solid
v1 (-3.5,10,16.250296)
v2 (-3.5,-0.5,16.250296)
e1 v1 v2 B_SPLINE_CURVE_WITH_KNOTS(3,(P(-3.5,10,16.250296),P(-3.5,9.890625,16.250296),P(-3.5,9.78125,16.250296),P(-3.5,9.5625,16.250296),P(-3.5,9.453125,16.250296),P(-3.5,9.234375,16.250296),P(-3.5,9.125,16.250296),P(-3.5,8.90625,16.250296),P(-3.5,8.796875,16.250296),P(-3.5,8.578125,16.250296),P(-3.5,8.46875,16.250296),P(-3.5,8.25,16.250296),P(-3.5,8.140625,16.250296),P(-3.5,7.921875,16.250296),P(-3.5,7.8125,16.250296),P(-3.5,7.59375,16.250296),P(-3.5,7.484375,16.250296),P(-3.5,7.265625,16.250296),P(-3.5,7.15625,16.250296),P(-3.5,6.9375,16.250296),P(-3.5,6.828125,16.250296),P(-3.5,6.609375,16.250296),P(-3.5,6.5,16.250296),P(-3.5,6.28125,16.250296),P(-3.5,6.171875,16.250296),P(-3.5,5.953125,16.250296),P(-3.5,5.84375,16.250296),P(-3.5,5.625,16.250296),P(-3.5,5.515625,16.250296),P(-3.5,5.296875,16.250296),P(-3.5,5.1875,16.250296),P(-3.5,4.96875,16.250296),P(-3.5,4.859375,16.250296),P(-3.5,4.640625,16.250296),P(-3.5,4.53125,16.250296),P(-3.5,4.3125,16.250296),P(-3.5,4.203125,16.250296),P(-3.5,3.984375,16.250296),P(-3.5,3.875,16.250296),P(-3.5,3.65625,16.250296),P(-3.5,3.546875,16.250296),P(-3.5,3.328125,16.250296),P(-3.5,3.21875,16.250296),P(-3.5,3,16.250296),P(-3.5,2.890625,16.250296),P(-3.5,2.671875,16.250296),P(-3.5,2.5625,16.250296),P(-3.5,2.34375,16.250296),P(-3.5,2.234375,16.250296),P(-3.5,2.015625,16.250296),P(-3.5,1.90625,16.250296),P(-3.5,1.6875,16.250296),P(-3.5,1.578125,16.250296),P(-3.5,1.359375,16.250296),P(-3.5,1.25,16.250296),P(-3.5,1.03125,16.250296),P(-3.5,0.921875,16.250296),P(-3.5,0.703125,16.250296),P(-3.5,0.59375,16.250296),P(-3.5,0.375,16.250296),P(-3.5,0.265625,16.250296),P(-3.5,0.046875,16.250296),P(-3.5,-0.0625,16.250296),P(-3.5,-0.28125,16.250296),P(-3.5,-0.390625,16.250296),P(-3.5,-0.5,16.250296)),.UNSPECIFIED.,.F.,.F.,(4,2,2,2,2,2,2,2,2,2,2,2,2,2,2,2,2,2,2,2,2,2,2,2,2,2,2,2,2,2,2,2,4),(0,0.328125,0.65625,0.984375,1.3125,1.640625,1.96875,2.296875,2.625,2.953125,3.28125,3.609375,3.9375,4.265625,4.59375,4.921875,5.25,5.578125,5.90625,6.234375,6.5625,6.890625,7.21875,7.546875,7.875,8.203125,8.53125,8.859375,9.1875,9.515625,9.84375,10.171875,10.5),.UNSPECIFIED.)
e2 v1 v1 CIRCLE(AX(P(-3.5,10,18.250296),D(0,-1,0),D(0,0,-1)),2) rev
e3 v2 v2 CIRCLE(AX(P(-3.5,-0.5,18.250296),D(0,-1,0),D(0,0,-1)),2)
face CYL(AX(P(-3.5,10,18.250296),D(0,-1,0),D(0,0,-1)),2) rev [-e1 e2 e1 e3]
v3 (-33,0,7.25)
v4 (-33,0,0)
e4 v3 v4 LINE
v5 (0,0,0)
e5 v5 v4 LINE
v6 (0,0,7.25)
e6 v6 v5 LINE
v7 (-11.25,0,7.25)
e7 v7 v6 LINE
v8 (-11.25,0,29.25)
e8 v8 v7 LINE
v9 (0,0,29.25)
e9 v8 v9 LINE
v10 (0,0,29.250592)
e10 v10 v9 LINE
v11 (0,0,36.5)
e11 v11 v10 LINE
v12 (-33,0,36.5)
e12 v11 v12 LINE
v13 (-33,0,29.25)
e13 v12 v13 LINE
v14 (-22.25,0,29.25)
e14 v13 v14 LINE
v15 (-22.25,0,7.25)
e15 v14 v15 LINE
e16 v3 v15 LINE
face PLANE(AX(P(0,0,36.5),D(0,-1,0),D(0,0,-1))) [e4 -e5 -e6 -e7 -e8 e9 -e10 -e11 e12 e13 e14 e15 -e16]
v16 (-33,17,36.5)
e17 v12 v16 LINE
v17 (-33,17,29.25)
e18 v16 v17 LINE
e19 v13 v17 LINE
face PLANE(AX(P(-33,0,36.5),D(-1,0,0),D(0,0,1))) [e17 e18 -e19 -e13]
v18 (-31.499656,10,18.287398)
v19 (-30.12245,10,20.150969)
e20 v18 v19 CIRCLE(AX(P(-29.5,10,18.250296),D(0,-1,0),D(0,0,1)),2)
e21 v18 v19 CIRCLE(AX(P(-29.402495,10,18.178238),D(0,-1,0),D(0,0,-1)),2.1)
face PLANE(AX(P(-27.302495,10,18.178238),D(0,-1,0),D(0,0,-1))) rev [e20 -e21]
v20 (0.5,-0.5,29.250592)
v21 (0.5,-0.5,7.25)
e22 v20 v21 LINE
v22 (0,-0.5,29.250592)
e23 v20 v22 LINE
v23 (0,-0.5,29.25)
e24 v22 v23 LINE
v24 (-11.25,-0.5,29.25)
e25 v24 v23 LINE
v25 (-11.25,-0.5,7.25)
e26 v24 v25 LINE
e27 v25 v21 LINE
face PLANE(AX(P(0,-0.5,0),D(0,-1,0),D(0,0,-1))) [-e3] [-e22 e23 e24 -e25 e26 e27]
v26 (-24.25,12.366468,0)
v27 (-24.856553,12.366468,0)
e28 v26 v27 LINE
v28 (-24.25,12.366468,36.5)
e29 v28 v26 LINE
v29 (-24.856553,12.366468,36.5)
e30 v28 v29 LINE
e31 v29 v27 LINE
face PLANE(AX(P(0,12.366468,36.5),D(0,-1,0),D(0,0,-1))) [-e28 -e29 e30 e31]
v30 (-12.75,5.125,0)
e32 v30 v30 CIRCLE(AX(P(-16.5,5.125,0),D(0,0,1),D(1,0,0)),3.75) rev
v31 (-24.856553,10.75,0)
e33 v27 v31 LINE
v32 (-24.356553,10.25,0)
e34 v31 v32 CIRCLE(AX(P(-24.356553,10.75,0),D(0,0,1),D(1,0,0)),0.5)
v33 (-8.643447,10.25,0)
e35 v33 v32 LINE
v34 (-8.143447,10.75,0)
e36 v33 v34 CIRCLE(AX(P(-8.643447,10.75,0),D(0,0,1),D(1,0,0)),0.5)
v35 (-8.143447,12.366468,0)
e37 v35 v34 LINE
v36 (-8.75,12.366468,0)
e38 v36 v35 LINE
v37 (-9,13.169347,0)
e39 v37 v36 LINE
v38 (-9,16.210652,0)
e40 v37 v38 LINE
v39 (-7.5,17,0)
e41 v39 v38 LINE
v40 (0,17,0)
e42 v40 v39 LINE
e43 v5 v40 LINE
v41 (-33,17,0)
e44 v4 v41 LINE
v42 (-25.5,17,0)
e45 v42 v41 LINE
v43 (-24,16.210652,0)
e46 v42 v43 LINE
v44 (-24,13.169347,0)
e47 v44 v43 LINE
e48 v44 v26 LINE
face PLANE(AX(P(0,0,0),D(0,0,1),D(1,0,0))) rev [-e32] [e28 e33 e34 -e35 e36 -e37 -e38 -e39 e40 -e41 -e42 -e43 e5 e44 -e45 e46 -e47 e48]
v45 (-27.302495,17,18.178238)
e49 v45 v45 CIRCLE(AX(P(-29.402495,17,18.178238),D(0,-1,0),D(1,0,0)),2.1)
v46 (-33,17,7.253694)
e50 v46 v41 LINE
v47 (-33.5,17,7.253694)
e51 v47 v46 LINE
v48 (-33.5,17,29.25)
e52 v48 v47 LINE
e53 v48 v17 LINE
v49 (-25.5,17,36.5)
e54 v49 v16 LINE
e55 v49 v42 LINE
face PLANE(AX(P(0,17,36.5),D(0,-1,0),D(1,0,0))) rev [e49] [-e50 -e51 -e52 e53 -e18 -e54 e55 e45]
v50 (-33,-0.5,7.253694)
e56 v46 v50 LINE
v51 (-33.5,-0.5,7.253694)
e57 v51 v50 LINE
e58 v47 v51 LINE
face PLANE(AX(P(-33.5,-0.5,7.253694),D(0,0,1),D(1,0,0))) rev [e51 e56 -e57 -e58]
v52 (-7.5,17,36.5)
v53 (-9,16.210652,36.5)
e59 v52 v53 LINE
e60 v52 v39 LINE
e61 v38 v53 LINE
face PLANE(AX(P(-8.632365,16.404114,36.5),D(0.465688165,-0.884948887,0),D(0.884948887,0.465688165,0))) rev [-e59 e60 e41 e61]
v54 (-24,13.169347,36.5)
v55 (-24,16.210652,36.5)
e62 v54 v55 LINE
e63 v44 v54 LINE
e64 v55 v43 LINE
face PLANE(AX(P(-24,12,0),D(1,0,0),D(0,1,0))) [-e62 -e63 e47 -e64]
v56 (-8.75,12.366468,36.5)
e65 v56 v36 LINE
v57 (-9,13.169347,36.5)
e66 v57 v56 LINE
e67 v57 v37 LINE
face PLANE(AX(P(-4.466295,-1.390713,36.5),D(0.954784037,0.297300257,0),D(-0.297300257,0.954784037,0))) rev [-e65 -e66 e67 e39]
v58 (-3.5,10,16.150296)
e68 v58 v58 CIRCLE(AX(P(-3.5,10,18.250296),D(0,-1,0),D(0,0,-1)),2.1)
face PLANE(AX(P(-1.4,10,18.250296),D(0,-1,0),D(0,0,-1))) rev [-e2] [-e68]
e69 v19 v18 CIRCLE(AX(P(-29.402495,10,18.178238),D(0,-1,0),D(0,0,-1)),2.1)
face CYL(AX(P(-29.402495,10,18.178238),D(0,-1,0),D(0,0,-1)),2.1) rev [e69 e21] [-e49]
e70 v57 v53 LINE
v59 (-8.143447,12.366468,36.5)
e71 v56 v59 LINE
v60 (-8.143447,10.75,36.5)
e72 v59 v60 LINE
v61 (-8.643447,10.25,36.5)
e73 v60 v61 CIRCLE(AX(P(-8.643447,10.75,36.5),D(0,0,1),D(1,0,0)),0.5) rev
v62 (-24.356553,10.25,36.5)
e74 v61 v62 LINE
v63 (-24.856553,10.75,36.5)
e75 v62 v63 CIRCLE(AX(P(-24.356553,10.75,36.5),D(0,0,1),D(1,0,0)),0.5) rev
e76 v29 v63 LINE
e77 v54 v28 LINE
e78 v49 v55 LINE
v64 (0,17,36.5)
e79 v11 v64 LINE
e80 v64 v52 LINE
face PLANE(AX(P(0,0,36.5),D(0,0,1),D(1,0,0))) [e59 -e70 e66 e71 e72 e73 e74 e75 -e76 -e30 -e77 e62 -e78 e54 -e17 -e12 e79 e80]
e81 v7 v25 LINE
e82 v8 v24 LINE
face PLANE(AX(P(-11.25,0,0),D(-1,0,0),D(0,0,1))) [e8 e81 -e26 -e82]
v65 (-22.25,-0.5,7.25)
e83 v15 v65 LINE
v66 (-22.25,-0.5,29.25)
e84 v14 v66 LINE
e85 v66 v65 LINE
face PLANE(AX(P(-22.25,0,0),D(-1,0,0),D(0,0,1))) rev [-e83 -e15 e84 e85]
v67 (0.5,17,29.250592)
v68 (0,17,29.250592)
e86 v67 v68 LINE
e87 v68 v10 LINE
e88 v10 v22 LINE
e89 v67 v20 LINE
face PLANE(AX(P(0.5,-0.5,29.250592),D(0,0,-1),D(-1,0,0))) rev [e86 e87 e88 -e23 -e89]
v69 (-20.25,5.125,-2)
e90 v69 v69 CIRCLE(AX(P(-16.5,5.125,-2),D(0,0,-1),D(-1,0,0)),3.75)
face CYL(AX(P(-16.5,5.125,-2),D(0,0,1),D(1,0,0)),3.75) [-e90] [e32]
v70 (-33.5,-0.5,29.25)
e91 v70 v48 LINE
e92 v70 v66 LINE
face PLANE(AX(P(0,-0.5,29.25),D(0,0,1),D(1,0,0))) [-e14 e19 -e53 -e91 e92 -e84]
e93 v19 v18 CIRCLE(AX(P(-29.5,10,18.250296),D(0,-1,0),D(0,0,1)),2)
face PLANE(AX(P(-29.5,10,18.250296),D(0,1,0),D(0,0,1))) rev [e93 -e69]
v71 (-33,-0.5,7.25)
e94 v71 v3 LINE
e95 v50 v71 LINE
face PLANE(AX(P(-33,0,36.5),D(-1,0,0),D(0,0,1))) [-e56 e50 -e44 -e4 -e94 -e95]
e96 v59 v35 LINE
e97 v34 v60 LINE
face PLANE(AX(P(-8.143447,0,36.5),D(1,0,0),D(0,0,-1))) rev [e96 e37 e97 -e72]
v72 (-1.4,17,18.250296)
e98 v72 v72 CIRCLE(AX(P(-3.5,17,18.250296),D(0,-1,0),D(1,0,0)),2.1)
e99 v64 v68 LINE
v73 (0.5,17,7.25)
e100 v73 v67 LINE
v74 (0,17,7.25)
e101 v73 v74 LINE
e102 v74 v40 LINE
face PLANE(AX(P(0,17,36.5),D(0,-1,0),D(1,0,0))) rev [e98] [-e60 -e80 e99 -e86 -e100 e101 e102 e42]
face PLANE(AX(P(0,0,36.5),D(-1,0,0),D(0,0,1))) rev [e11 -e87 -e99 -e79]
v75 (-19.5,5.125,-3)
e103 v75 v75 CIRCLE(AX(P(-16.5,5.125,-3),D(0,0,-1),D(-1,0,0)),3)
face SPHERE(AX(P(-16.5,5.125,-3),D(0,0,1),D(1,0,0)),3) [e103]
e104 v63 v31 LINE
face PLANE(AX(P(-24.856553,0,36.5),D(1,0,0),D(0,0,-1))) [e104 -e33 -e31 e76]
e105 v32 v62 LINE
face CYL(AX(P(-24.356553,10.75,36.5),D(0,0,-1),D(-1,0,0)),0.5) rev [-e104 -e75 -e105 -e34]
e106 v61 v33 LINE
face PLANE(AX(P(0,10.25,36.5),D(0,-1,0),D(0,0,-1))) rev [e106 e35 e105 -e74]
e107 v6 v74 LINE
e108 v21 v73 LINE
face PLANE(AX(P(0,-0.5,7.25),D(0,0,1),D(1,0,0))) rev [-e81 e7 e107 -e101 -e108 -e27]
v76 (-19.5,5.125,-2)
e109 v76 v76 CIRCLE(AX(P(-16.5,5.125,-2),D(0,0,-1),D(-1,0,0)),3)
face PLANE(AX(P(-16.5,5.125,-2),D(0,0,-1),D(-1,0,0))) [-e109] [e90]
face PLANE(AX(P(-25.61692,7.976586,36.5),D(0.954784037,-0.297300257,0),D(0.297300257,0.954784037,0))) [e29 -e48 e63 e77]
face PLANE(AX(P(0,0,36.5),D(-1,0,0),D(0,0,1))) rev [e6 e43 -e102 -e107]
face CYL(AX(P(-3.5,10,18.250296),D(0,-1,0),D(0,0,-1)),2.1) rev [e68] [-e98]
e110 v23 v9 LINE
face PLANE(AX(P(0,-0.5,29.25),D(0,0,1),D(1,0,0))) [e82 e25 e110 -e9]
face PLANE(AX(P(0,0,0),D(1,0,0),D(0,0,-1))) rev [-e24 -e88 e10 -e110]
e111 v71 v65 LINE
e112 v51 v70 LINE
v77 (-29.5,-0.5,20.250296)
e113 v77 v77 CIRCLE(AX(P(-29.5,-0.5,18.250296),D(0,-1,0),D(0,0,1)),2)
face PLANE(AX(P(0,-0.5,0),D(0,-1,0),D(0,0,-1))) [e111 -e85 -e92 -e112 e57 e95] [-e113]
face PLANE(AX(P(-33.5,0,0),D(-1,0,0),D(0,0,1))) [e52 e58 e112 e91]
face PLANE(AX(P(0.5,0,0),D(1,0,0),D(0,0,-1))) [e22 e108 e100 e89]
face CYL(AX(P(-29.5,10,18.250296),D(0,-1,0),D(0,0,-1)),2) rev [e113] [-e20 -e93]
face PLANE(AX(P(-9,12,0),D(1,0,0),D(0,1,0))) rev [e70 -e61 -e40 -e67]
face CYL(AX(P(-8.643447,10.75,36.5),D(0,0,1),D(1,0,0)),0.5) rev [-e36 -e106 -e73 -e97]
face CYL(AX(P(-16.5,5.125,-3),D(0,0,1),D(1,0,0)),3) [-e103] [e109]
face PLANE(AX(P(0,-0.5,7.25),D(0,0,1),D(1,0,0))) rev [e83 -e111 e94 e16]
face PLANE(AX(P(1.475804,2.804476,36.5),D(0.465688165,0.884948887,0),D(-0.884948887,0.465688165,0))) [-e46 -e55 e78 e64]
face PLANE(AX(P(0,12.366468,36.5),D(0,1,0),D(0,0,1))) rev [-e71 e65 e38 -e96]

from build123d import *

# Parameters (mm, degrees)
BOSS_EXTRU_2_DEPTH         = 36.5
CONG_1_R                   = 0.5
ESQUISSE2_R                = 3.75
BOSS_EXTRU_3_DEPTH         = 2
ESQUISSE3_R                = 3
BOSS_EXTRU_4_DEPTH         = 1
ESQUISSE5_W                = 7.5
ESQUISSE5_H                = 37.315621328
ENL_V_MAT_EXTRU_2_DEPTH    = 5
ESQUISSE6_W                = 33
ESQUISSE6_H                = 22
BOSS_EXTRU_6_DEPTH         = 0.5
ESQUISSE7_W                = 22.000592026
ESQUISSE7_H                = 17.5
BOSS_EXTRU_7_DEPTH         = 0.5
ESQUISSE8_W                = 21.996306334
ESQUISSE8_H                = 17.5
BOSS_EXTRU_8_DEPTH         = 0.5
ESQUISSE9_W                = 5.5
ESQUISSE9_H                = 22
ENL_V_MAT_EXTRU_3_DEPTH    = 0.5
ESQUISSE10_R               = 2
ENL_V_MAT_EXTRU_4_DEPTH    = 10.5
ESQUISSE11_W               = 2.1
ESQUISSE11_H               = 7.00005
TROU_TARAUD_M51_AT_2_COUNT = 2
TROU_TARAUD_M51_AT_2_PITCH = 25.902595086


# Read off the part's stored shape, not the designer's step: Dôme1
with BuildPart() as part:
    # Esquisse1 → Boss.-Extru.2 (new body)
    with BuildSketch(Plane.XY):
        Polygon((-16.5, 0), (-16.5, 10.25), (-22.270485302, 10.25), (-24.856553081, 10.25), (-24.856553081, 12.366468473), (-24.25, 12.366468473), (-23.5, 14.775104227), (-23.5, 15.186461692), (-23, 15.684420728), (-25.5, 17), (-33, 17), (-33, 0), align=None)
        Polygon((-10.729514698, 10.25), (-16.5, 10.25), (-16.5, 0), (0, 0), (0, 17), (-7.5, 17), (-10, 15.684420728), (-9.5, 15.186461692), (-9.5, 14.775104227), (-8.75, 12.366468473), (-8.143446919, 12.366468473), (-8.143446919, 10.25), align=None)
    extrude(amount=BOSS_EXTRU_2_DEPTH)

    # Congé1
    cong_1_edges = [part.edges().sort_by_distance(p)[0] for p in [
        (-23.5, 15.186461692, 18.25),
        (-24.856553081, 10.25, 18.25),
        (-8.143446919, 10.25, 18.25),
        (-9.5, 15.186461692, 18.25),
    ]]
    fillet(cong_1_edges, radius=CONG_1_R)

    # Esquisse2 → Boss.-Extru.3 (add)
    with BuildSketch(Plane(origin=(0, 0, 0), x_dir=(-1, 0, 0), z_dir=(0, 0, -1))):
        with Locations(Location((16.5, 5.125, 0), (0, 0, 180))):
            Circle(ESQUISSE2_R)
    extrude(amount=BOSS_EXTRU_3_DEPTH)

    # Esquisse3 → Boss.-Extru.4 (add)
    with BuildSketch(Plane(origin=(0, 0, -2), x_dir=(-1, 0, 0), z_dir=(0, 0, -1))):
        with Locations((16.5, 5.125)):
            Circle(ESQUISSE3_R)
    extrude(amount=BOSS_EXTRU_4_DEPTH)

    # Dôme1 outline → Dôme1 (revolve)
    with BuildSketch(Plane(origin=(-16.5, 5.125, 0), x_dir=(1, 0, 0), z_dir=(0, -1, 0))):
        with BuildLine():
            Line((0, -2.999999997), (0, -6))
            ThreePointArc((0, -6), (2.121320345, -5.121320342), (3, -2.999999997))
            Line((3, -2.999999997), (0, -2.999999997))
        make_face()
    revolve(axis=Axis((-16.5, 5.125, 0), (0, 0, 1)))

    # Esquisse5 → Enlèv. mat.-Extru.2 (cut)
    with BuildSketch(Plane(origin=(0, 17, 0), x_dir=(1, 0, 0), z_dir=(0, 1, 0))):
        with Locations((-12.75, -18.657810664)):
            Rectangle(ESQUISSE5_W, ESQUISSE5_H)
        with Locations((-20.25, -18.657810664)):
            Rectangle(ESQUISSE5_W, ESQUISSE5_H)
    extrude(amount=-ENL_V_MAT_EXTRU_2_DEPTH, mode=Mode.SUBTRACT)

    # Esquisse6 → Boss.-Extru.6 (add)
    with BuildSketch(Plane(origin=(0, 0, 0), x_dir=(-1, 0, 0), z_dir=(0, -1, 0))):
        with Locations((16.5, -18.25)):
            Rectangle(ESQUISSE6_W, ESQUISSE6_H)
    extrude(amount=BOSS_EXTRU_6_DEPTH)

    # Esquisse7 → Boss.-Extru.7 (add)
    with BuildSketch(Plane(origin=(0, 0, 0), x_dir=(0, 0, -1), z_dir=(1, 0, 0))):
        with Locations((-18.250296013, 8.25)):
            Rectangle(ESQUISSE7_W, ESQUISSE7_H)
    extrude(amount=BOSS_EXTRU_7_DEPTH)

    # Esquisse8 → Boss.-Extru.8 (add)
    with BuildSketch(Plane.ZY.offset(33)):
        with Locations((18.251846833, 8.25)):
            Rectangle(ESQUISSE8_W, ESQUISSE8_H)
    extrude(amount=BOSS_EXTRU_8_DEPTH)

    # Esquisse9 → Enlèv. mat.-Extru.3 (cut)
    with BuildSketch(Plane(origin=(0, -0.5, 0), x_dir=(-1, 0, 0), z_dir=(0, -1, 0))):
        with Locations((14, -18.25)):
            Rectangle(ESQUISSE9_W, ESQUISSE9_H)
        with Locations((19.5, -18.25)):
            Rectangle(ESQUISSE9_W, ESQUISSE9_H)
    extrude(amount=-ENL_V_MAT_EXTRU_3_DEPTH, mode=Mode.SUBTRACT)

    # Esquisse10 → Enlèv. mat.-Extru.4 (cut)
    with BuildSketch(Plane.XZ.offset(0.5)):
        with Locations(Location((-3.5, 18.250296013, 0), (0, 0, 270))):
            Circle(ESQUISSE10_R)
        with Locations(Location((-29.5, 18.250296013, 0), (0, 0, 270))):
            Circle(ESQUISSE10_R)
    extrude(amount=-ENL_V_MAT_EXTRU_4_DEPTH, mode=Mode.SUBTRACT)

    # Esquisse11 → Trou taraudé M51 (revolve, cut)
    with BuildSketch(Plane(origin=(-29.402494858, 10, 18.178238283), x_dir=(0, 0, -1), z_dir=(1, 0, 0))):
        with Locations((1.05, 3.500025)):
            Rectangle(ESQUISSE11_W, ESQUISSE11_H)
    trou_taraud_m51 = revolve(axis=Axis((-29.402494858, 3.65, 18.178238283), (0, 1, 0)), mode=Mode.SUBTRACT)

    # Trou taraudé M51 at 2: Trou taraudé M51 ×2
    with Locations(*[Vector(0.9999961305838194, 0, 0.002781873000113731) * (i * TROU_TARAUD_M51_AT_2_PITCH) for i in range(1, TROU_TARAUD_M51_AT_2_COUNT)]):
        add(trou_taraud_m51, mode=Mode.SUBTRACT)


solid = part.part
